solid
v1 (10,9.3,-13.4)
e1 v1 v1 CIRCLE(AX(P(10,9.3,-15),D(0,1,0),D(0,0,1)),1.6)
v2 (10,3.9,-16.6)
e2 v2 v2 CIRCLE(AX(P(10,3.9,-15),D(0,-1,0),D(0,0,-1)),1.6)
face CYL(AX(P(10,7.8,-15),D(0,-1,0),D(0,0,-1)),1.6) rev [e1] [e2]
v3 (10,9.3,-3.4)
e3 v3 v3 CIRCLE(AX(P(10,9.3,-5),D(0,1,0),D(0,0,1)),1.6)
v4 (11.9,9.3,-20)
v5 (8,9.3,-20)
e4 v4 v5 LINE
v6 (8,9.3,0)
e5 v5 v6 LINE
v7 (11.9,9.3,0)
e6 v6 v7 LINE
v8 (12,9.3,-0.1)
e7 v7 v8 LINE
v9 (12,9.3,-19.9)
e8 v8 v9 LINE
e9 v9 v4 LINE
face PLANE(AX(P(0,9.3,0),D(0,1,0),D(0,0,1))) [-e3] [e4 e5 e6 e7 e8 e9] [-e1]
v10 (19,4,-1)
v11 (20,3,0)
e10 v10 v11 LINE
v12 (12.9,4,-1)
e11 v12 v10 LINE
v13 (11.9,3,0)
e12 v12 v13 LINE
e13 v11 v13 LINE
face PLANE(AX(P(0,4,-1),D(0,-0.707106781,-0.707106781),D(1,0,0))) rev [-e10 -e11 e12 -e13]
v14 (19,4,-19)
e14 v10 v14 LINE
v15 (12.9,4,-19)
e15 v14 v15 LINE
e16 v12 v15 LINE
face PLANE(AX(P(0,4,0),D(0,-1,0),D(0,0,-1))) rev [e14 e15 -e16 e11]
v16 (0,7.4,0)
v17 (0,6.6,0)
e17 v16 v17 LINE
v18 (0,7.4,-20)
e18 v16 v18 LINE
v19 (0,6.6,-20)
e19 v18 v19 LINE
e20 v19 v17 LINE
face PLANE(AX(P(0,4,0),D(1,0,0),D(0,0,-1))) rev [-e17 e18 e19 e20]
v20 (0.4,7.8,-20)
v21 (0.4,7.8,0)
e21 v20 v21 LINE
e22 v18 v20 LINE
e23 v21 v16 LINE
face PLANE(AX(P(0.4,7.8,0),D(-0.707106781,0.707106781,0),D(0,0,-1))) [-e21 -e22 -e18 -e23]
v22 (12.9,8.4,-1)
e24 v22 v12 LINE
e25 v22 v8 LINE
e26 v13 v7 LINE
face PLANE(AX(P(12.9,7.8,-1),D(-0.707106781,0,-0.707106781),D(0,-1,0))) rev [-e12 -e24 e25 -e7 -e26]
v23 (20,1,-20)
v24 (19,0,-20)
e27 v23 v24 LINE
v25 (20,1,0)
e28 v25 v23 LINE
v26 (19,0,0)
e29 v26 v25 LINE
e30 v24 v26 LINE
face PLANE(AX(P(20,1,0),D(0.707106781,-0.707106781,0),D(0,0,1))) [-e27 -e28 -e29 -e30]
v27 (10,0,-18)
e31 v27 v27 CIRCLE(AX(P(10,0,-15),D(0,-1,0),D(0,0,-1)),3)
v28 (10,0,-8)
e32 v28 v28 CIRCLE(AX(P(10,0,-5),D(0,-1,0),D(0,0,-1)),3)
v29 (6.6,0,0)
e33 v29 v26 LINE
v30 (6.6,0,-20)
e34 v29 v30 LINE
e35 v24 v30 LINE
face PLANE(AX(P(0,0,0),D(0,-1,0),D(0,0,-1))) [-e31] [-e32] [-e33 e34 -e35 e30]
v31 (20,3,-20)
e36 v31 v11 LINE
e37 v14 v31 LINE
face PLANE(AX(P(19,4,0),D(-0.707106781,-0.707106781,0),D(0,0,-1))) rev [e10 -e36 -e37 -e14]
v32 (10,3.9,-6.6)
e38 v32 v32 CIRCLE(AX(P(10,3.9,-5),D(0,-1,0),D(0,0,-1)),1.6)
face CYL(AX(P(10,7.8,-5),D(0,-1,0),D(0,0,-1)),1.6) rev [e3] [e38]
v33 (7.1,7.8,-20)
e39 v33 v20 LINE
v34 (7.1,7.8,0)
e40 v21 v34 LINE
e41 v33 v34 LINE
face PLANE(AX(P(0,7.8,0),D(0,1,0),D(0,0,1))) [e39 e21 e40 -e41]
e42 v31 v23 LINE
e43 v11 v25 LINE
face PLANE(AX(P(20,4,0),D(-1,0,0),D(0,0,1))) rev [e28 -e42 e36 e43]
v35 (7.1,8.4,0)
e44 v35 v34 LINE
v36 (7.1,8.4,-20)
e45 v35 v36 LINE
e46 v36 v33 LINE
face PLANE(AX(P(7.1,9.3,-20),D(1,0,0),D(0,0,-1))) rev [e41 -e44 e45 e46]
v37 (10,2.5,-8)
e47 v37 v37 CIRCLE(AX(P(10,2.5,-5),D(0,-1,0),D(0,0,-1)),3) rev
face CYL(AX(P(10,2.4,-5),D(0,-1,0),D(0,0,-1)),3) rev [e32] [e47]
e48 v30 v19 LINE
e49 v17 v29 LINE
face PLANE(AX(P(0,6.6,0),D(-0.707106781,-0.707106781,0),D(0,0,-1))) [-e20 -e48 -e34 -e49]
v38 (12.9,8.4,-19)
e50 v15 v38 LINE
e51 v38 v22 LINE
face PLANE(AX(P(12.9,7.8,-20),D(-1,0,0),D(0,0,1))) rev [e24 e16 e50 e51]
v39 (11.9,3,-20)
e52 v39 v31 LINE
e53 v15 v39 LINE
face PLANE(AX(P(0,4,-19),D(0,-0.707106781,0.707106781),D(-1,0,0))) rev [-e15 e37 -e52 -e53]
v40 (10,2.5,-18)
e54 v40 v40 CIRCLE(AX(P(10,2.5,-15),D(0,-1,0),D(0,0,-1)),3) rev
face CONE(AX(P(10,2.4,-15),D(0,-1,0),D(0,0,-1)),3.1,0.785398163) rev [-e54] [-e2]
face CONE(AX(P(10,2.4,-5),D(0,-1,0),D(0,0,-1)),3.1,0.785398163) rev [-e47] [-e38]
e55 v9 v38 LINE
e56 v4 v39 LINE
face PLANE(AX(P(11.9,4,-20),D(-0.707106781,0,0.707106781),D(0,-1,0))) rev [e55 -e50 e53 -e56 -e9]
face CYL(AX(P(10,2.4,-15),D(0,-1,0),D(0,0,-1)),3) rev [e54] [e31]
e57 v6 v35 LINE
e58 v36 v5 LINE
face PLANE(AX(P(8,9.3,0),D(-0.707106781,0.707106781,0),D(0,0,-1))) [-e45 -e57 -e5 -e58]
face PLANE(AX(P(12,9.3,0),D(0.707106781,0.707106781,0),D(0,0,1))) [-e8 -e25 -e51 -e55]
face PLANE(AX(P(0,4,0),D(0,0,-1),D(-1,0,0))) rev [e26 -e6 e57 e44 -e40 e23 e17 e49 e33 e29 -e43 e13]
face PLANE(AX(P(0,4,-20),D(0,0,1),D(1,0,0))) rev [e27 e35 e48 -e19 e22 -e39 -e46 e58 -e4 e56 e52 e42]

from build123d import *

# Parameters (mm, degrees)
SKETCH_1_W          = 20
SKETCH_1_H          = 20
EXTRUDE_1_DEPTH     = 4
SKETCH_2_W          = 12.9
SKETCH_2_H          = 20
EXTRUDE_2_DEPTH     = 3.8
SKETCH_3_R          = 1.6
CUT_EXTRUDE_1_DEPTH = 30.340074983
SKETCH_4_W          = 5.8
SKETCH_4_H          = 20
SKETCH_4_R          = 1.6
EXTRUDE_3_DEPTH     = 1.5
SKETCH_5_R          = 3
CUT_EXTRUDE_3_DEPTH = 2.4
CHAMFER_3_SIZE      = 1.5
CHAMFER_1_SIZE      = 6.6
CHAMFER_2_SIZE      = 1
CHAMFER_4_SIZE      = 0.4
CHAMFER_5_SIZE      = 0.9


with BuildPart() as part:
    # 草图1 → 凸台-拉伸1 (new body)
    with BuildSketch(Plane(origin=(0, 0, 0), x_dir=(1, 0, 0), z_dir=(0, 1, 0))):
        with Locations((10, 10)):
            Rectangle(SKETCH_1_W, SKETCH_1_H)
    extrude(amount=EXTRUDE_1_DEPTH)

    # 草图2 → 凸台-拉伸2 (add)
    with BuildSketch(Plane(origin=(0, 4, 0), x_dir=(1, 0, 0), z_dir=(0, 1, 0))):
        with Locations((6.45, 10)):
            Rectangle(SKETCH_2_W, SKETCH_2_H)
    extrude(amount=EXTRUDE_2_DEPTH)

    # 草图3 → 切除-拉伸1 (cut, through all)
    with BuildSketch(Plane(origin=(0, 0, 0), x_dir=(-1, 0, 0), z_dir=(0, -1, 0))):
        with Locations(Location((-10, 5, 0), (0, 0, 90))):
            Circle(SKETCH_3_R)
        with Locations(Location((-10, 15, 0), (0, 0, 90))):
            Circle(SKETCH_3_R)
    extrude(amount=-CUT_EXTRUDE_1_DEPTH, mode=Mode.SUBTRACT)

    # 草图4 → 凸台-拉伸3 (add)
    with BuildSketch(Plane(origin=(0, 7.8, 0), x_dir=(1, 0, 0), z_dir=(0, 1, 0))):
        with Locations((10, 10)):
            Rectangle(SKETCH_4_W, SKETCH_4_H)
        with Locations(Location((10, 15, 0), (0, 0, 90))):
            Circle(SKETCH_4_R, mode=Mode.SUBTRACT)
        with Locations(Location((10, 5, 0), (0, 0, 90))):
            Circle(SKETCH_4_R, mode=Mode.SUBTRACT)
    extrude(amount=EXTRUDE_3_DEPTH)

    # 草图5 → 切除-拉伸3 (cut)
    with BuildSketch(Plane(origin=(0, 0, 0), x_dir=(-1, 0, 0), z_dir=(0, -1, 0))):
        with Locations(Location((-10, 5, 0), (0, 0, 90))):
            Circle(SKETCH_5_R)
        with Locations(Location((-10, 15, 0), (0, 0, 90))):
            Circle(SKETCH_5_R)
    extrude(amount=-CUT_EXTRUDE_3_DEPTH, mode=Mode.SUBTRACT)

    # 倒角3
    # the kernel refuses this chamfer: 1.5 mm, written as the material it takes off along each edge
    with BuildSketch(Plane(origin=(10, 2.4, -15), x_dir=(0, 0, -1), z_dir=(-1, 0, 0))) as chamfer_3_piece_1_section:
        Polygon((1.6 + CHAMFER_3_SIZE, 0), (1.6, -CHAMFER_3_SIZE), (1.6, 0), align=None)
    chamfer_3_piece_1 = revolve(axis=Axis((10, 2.4, -15), (0, -1, 0)), mode=Mode.PRIVATE)
    chamfer_3_piece_1 = chamfer_3_piece_1 & Plane(origin=(10, 3.20338318, -15), x_dir=(0, 0, -1), z_dir=(0, -1, 0)) * Cylinder(3, 13, mode=Mode.PRIVATE)
    add(chamfer_3_piece_1, mode=Mode.SUBTRACT)
    with BuildSketch(Plane(origin=(10, 2.4, -5), x_dir=(0, 0, -1), z_dir=(-1, 0, 0))) as chamfer_3_piece_2_section:
        Polygon((1.6 + CHAMFER_3_SIZE, 0), (1.6, -CHAMFER_3_SIZE), (1.6, 0), align=None)
    chamfer_3_piece_2 = revolve(axis=Axis((10, 2.4, -5), (0, -1, 0)), mode=Mode.PRIVATE)
    chamfer_3_piece_2 = chamfer_3_piece_2 & Plane(origin=(10, 3.20338318, -5), x_dir=(0, 0, -1), z_dir=(0, -1, 0)) * Cylinder(3, 13, mode=Mode.PRIVATE)
    add(chamfer_3_piece_2, mode=Mode.SUBTRACT)

    # 倒角1
    chamfer_1_edges = [part.edges().sort_by_distance(p)[0] for p in [
        (0, 0, -10),
    ]]
    chamfer(chamfer_1_edges, length=CHAMFER_1_SIZE)

    # 倒角2
    chamfer_2_edges = [part.edges().sort_by_distance(p)[0] for p in [
        (20, 4, -10),
        (16.45, 4, 0),
        (12.9, 6.65, 0),
        (12.9, 6.65, -20),
        (16.45, 4, -20),
        (20, 0, -10),
    ]]
    chamfer(chamfer_2_edges, length=CHAMFER_2_SIZE)

    # 倒角4
    chamfer_4_edges = [part.edges().sort_by_distance(p)[0] for p in [
        (0, 7.8, -10),
    ]]
    chamfer(chamfer_4_edges, length=CHAMFER_4_SIZE)

    # 倒角5
    chamfer_5_edges = [part.edges().sort_by_distance(p)[0] for p in [
        (7.1, 9.3, -10),
        (12.9, 9.3, -10),
    ]]
    chamfer(chamfer_5_edges, length=CHAMFER_5_SIZE)


solid = part.part
